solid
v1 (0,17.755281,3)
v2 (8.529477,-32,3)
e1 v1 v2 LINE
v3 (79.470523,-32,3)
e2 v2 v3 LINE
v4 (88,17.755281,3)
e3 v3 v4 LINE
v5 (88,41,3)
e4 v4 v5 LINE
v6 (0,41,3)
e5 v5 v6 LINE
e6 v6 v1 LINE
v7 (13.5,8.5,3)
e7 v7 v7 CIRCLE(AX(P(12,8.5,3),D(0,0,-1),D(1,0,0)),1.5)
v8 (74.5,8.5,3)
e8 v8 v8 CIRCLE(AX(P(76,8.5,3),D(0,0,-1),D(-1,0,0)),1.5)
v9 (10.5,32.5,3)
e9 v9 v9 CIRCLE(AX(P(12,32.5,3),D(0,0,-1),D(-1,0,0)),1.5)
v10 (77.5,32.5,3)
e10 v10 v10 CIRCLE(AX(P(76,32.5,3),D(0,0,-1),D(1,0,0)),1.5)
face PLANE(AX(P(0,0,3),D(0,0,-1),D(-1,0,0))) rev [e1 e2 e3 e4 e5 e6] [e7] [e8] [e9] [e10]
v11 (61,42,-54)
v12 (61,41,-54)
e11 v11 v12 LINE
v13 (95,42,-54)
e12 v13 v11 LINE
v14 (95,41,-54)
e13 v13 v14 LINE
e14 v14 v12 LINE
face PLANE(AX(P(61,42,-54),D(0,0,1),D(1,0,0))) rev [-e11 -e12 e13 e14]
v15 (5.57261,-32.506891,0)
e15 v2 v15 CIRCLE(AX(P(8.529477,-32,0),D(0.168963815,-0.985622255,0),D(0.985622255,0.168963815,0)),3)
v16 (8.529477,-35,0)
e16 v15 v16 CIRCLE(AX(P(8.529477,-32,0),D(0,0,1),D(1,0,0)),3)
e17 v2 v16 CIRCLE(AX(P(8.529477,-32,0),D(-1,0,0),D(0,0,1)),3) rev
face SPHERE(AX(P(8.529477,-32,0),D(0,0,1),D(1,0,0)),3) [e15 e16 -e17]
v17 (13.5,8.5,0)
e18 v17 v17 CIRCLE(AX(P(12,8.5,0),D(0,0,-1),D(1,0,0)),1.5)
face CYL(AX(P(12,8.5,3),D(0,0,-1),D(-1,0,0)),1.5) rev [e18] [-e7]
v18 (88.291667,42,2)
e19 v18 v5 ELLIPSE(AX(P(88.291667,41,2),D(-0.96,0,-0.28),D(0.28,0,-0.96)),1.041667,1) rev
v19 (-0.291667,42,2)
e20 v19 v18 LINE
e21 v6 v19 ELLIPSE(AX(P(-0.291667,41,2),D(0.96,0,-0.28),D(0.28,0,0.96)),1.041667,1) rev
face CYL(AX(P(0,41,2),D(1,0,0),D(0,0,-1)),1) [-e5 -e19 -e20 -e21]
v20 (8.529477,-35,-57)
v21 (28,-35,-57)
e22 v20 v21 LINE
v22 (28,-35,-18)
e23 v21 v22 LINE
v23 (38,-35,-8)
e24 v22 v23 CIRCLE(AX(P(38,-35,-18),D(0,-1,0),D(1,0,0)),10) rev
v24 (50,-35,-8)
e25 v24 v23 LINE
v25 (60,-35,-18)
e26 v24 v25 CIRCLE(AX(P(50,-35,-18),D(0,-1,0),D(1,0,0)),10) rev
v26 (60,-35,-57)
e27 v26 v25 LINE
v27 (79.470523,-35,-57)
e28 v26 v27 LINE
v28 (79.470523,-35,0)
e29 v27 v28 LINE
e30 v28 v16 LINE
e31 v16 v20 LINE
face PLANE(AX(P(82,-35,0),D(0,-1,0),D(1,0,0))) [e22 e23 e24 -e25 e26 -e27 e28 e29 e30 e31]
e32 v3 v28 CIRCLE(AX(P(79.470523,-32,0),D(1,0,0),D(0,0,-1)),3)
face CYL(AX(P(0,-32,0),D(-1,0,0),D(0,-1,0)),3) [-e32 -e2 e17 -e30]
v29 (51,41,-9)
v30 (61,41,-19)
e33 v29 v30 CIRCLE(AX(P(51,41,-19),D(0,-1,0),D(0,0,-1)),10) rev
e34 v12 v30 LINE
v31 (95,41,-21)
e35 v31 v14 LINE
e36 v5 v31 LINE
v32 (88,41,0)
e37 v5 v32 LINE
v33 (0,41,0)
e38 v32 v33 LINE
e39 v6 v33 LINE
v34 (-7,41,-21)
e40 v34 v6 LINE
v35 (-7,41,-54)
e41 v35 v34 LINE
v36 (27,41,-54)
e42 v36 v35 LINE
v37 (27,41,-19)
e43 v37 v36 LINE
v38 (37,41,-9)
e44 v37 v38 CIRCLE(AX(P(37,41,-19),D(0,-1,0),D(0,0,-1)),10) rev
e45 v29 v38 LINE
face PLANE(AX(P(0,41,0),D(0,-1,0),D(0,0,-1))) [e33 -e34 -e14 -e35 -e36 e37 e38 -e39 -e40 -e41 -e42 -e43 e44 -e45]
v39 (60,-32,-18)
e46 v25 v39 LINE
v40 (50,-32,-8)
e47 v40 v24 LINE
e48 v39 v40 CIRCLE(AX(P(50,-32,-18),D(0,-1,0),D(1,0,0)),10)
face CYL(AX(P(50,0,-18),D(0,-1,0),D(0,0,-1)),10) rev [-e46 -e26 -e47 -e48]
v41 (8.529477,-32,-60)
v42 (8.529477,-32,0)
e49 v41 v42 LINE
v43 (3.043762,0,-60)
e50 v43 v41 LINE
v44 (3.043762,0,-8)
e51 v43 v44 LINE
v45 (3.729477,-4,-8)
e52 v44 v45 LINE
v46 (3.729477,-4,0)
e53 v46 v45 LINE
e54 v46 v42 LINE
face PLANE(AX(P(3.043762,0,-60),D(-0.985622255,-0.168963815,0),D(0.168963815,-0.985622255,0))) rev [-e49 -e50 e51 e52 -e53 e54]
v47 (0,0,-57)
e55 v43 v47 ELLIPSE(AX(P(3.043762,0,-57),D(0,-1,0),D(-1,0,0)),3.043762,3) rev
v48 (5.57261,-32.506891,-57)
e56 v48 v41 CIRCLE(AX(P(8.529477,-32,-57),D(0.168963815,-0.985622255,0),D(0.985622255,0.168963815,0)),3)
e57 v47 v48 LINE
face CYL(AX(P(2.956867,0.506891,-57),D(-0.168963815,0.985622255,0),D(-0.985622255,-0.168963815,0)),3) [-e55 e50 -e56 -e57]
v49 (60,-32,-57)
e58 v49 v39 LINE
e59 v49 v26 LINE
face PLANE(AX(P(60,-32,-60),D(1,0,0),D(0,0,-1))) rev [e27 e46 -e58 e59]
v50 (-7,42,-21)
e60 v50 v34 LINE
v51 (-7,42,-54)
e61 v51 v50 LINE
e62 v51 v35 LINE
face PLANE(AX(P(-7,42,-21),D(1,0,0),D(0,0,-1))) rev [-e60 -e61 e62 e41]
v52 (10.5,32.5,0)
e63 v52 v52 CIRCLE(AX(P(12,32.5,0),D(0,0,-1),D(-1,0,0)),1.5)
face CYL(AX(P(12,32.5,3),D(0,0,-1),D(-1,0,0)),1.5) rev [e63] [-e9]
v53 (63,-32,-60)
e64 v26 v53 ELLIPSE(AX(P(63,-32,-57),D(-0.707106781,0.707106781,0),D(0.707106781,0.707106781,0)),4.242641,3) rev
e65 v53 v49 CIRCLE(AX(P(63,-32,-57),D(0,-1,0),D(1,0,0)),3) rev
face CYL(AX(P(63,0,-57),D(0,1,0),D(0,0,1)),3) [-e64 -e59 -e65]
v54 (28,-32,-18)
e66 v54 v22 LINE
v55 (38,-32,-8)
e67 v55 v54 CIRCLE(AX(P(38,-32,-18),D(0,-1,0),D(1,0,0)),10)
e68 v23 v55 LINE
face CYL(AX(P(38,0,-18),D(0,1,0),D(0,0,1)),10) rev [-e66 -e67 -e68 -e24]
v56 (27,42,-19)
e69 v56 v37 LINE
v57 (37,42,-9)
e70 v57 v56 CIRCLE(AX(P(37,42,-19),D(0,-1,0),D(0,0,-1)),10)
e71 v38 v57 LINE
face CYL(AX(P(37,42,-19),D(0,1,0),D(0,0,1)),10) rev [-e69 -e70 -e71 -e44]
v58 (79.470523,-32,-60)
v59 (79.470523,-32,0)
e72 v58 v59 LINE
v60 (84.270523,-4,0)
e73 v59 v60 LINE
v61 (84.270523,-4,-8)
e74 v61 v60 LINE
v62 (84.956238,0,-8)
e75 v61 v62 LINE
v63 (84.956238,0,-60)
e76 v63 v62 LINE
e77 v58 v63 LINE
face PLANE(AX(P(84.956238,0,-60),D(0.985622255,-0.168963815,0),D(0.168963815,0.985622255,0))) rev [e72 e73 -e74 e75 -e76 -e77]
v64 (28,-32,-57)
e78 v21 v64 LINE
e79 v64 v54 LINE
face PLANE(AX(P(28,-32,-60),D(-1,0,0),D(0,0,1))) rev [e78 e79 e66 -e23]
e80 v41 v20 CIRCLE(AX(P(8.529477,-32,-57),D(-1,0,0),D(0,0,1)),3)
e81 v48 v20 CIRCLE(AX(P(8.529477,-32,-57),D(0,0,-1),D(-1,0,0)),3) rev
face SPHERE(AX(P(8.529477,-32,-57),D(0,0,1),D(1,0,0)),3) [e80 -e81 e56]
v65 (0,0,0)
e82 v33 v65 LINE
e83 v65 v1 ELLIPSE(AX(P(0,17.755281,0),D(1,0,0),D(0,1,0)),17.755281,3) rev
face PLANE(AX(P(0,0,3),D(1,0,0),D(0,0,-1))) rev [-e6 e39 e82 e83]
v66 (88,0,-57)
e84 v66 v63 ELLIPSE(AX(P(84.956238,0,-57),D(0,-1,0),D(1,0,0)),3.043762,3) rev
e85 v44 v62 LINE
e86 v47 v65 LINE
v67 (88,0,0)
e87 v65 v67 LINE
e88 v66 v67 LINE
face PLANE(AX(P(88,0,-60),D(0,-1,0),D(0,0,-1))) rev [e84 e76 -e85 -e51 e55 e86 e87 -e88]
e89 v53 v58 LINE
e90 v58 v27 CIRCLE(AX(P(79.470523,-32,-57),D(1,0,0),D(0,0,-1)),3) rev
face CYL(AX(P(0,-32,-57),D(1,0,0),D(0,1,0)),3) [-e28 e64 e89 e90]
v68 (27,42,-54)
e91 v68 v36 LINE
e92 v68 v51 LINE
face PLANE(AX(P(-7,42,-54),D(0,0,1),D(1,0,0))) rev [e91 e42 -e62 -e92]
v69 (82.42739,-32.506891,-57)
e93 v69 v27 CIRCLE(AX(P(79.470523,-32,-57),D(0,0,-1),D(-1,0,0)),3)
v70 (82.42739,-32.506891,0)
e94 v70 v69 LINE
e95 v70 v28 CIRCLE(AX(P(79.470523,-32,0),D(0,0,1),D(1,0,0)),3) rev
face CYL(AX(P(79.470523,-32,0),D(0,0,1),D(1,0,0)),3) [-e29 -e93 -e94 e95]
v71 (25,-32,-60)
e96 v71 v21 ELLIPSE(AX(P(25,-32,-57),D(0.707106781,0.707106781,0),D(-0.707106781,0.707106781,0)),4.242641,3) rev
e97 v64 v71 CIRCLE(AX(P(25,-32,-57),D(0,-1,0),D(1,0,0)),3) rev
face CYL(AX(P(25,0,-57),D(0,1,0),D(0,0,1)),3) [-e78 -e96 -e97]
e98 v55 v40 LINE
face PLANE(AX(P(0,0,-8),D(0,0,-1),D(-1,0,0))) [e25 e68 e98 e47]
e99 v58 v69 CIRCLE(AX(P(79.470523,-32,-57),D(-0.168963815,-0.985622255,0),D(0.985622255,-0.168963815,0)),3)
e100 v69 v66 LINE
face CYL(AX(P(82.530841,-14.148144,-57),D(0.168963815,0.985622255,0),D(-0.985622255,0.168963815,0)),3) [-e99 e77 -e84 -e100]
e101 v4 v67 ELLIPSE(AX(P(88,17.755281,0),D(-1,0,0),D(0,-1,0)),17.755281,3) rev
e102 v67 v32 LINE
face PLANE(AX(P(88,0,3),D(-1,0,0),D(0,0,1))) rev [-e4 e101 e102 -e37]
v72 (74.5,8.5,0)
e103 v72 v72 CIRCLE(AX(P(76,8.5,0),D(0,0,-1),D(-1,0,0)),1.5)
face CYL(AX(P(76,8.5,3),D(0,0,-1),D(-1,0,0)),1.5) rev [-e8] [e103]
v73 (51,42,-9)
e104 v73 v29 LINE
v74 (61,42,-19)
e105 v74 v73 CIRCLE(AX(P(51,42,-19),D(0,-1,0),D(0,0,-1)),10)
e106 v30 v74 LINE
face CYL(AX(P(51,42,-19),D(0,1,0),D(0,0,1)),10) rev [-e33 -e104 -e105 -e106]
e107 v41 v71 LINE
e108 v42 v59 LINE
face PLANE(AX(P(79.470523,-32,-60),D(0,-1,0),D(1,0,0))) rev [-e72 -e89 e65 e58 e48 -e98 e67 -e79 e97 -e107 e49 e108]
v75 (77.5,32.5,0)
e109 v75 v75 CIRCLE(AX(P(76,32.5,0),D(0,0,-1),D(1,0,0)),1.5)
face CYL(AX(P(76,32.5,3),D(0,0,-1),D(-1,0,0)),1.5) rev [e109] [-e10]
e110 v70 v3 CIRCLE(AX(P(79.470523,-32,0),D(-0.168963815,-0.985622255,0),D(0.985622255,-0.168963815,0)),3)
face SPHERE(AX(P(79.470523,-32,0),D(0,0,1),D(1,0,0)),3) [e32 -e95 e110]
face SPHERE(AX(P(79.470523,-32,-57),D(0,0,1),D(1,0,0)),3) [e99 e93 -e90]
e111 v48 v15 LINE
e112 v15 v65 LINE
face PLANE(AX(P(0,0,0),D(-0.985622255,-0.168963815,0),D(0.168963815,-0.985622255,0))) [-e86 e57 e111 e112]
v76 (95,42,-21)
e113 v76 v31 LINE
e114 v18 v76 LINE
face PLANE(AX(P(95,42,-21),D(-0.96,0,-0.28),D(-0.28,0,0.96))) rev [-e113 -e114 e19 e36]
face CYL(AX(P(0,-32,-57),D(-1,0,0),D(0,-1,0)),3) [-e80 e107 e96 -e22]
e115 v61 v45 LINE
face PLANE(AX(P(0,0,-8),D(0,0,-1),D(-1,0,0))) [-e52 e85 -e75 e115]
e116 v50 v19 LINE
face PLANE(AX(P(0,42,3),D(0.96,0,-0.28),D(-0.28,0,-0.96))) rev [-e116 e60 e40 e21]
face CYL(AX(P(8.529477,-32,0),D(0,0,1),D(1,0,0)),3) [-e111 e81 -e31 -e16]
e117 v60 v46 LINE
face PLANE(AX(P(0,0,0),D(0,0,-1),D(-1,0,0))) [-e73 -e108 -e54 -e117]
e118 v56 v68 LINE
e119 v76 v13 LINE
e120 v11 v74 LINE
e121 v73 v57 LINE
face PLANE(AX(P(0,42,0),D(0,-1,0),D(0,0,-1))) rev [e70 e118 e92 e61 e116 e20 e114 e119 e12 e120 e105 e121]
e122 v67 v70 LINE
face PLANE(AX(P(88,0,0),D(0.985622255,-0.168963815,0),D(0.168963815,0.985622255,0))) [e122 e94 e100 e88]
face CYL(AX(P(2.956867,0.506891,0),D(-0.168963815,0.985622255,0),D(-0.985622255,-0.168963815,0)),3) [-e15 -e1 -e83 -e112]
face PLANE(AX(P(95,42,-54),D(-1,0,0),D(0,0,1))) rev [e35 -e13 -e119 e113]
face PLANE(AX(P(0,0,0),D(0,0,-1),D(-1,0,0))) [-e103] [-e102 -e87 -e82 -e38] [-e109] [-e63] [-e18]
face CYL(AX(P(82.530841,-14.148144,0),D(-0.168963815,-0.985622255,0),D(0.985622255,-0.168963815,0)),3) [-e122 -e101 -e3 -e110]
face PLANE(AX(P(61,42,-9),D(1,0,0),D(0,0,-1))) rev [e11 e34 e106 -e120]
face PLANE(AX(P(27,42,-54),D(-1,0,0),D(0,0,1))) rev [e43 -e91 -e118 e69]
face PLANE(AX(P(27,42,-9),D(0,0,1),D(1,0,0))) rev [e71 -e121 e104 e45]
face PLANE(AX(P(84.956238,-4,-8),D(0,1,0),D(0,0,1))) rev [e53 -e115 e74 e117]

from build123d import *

# Parameters (mm, degrees)
SKETCH1_W           = 88
SKETCH1_H           = 41
BOSS_EXTRUDE1_DEPTH = 3
BOSS_EXTRUDE2_DEPTH = 3
BOSS_EXTRUDE3_DEPTH = 60
BOSS_EXTRUDE4_DEPTH = 1
FILLET1_R           = 10
SKETCH5_W           = 32
SKETCH5_H           = 3
BOSS_EXTRUDE5_DEPTH = 8
FILLET2_R           = 10
FILLET6_R           = 1
FILLET12_R          = 3
SKETCH6_W           = 81.912475118
SKETCH6_H           = 4
BOSS_EXTRUDE6_DEPTH = 8
SKETCH7_R           = 1.5
CUT_EXTRUDE1_DEPTH  = 3


with BuildPart() as part:
    # Sketch1 → Boss-Extrude1 (new body)
    with BuildSketch(Plane.XY):
        with Locations((44, 20.5)):
            Rectangle(SKETCH1_W, SKETCH1_H)
    extrude(amount=BOSS_EXTRUDE1_DEPTH)

    # Sketch2 → Boss-Extrude2 (add)
    with BuildSketch(Plane.XY.offset(3)):
        Polygon((0, 0), (88, 0), (82, -35), (6, -35), align=None)
    extrude(amount=-BOSS_EXTRUDE2_DEPTH)

    # Sketch3 → Boss-Extrude3 (add)
    with BuildSketch(Plane(origin=(0, 0, 0), x_dir=(-1, 0, 0), z_dir=(0, 0, -1))):
        Polygon((-82, -35), (-88, 0), (-84.956237559, 0), (-79.470523274, -32), (-60, -32), (-60, -35), align=None)
        Polygon((-28, -35), (-6, -35), (0, 0), (-3.043762441, 0), (-8.529476726, -32), (-28, -32), align=None)
    extrude(amount=BOSS_EXTRUDE3_DEPTH)

    # Sketch4 → Boss-Extrude4 (add)
    with BuildSketch(Plane(origin=(0, 41, 0), x_dir=(1, 0, 0), z_dir=(0, 1, 0))):
        Polygon((0, -3), (-7, 21), (-7, 54), (27, 54), (27, 9), (61, 9), (61, 54), (95, 54), (95, 21), (88, -3), align=None)
    extrude(amount=BOSS_EXTRUDE4_DEPTH)

    # Fillet1
    fillet1_edges = [part.edges().sort_by_distance(p)[0] for p in [
        (61, 41.5, -9),
        (27, 41.5, -9),
    ]]
    fillet(fillet1_edges, radius=FILLET1_R)

    # Sketch5 → Boss-Extrude5 (add)
    with BuildSketch(Plane(origin=(0, 0, 0), x_dir=(-1, 0, 0), z_dir=(0, 0, -1))):
        with Locations((-44, -33.5)):
            Rectangle(SKETCH5_W, SKETCH5_H)
    extrude(amount=BOSS_EXTRUDE5_DEPTH)

    # Fillet2
    fillet2_edges = [part.edges().sort_by_distance(p)[0] for p in [
        (60, -33.5, -8),
        (28, -33.5, -8),
    ]]
    fillet(fillet2_edges, radius=FILLET2_R)

    # Fillet6
    fillet6_edges = [part.edges().sort_by_distance(p)[0] for p in [
        (44, 42, 3),
    ]]
    fillet(fillet6_edges, radius=FILLET6_R)

    # Fillet12
    fillet12_edges = [part.edges().sort_by_distance(p)[0] for p in [
        (85, -17.5, -60),
        (60, -33.5, -60),
        (28, -33.5, -60),
        (3, -17.5, -60),
        (3, -17.5, 3),
        (85, -17.5, 3),
        (71, -35, -60),
        (17, -35, -60),
        (82, -35, -28.5),
        (6, -35, -28.5),
        (44, -35, 3),
    ]]
    fillet(fillet12_edges, radius=FILLET12_R - 0.0001)  # a hair under: the kernel refuses the full size

    # Sketch6 → Boss-Extrude6 (add)
    with BuildSketch(Plane(origin=(0, 0, 0), x_dir=(-1, 0, 0), z_dir=(0, 0, -1))):
        with Locations((-44, -2)):
            Rectangle(SKETCH6_W, SKETCH6_H)
    extrude(amount=BOSS_EXTRUDE6_DEPTH)

    # Sketch7 → Cut-Extrude1 (cut)
    with BuildSketch(Plane(origin=(0, 0, 0), x_dir=(-1, 0, 0), z_dir=(0, 0, -1))):
        with Locations((-12, 32.5)):
            Circle(SKETCH7_R)
        with Locations(Location((-76, 32.5, 0), (0, 0, 180))):
            Circle(SKETCH7_R)
        with Locations((-76, 8.5)):
            Circle(SKETCH7_R)
        with Locations(Location((-12, 8.5, 0), (0, 0, 180))):
            Circle(SKETCH7_R)
    extrude(amount=-CUT_EXTRUDE1_DEPTH, mode=Mode.SUBTRACT)


solid = part.part
